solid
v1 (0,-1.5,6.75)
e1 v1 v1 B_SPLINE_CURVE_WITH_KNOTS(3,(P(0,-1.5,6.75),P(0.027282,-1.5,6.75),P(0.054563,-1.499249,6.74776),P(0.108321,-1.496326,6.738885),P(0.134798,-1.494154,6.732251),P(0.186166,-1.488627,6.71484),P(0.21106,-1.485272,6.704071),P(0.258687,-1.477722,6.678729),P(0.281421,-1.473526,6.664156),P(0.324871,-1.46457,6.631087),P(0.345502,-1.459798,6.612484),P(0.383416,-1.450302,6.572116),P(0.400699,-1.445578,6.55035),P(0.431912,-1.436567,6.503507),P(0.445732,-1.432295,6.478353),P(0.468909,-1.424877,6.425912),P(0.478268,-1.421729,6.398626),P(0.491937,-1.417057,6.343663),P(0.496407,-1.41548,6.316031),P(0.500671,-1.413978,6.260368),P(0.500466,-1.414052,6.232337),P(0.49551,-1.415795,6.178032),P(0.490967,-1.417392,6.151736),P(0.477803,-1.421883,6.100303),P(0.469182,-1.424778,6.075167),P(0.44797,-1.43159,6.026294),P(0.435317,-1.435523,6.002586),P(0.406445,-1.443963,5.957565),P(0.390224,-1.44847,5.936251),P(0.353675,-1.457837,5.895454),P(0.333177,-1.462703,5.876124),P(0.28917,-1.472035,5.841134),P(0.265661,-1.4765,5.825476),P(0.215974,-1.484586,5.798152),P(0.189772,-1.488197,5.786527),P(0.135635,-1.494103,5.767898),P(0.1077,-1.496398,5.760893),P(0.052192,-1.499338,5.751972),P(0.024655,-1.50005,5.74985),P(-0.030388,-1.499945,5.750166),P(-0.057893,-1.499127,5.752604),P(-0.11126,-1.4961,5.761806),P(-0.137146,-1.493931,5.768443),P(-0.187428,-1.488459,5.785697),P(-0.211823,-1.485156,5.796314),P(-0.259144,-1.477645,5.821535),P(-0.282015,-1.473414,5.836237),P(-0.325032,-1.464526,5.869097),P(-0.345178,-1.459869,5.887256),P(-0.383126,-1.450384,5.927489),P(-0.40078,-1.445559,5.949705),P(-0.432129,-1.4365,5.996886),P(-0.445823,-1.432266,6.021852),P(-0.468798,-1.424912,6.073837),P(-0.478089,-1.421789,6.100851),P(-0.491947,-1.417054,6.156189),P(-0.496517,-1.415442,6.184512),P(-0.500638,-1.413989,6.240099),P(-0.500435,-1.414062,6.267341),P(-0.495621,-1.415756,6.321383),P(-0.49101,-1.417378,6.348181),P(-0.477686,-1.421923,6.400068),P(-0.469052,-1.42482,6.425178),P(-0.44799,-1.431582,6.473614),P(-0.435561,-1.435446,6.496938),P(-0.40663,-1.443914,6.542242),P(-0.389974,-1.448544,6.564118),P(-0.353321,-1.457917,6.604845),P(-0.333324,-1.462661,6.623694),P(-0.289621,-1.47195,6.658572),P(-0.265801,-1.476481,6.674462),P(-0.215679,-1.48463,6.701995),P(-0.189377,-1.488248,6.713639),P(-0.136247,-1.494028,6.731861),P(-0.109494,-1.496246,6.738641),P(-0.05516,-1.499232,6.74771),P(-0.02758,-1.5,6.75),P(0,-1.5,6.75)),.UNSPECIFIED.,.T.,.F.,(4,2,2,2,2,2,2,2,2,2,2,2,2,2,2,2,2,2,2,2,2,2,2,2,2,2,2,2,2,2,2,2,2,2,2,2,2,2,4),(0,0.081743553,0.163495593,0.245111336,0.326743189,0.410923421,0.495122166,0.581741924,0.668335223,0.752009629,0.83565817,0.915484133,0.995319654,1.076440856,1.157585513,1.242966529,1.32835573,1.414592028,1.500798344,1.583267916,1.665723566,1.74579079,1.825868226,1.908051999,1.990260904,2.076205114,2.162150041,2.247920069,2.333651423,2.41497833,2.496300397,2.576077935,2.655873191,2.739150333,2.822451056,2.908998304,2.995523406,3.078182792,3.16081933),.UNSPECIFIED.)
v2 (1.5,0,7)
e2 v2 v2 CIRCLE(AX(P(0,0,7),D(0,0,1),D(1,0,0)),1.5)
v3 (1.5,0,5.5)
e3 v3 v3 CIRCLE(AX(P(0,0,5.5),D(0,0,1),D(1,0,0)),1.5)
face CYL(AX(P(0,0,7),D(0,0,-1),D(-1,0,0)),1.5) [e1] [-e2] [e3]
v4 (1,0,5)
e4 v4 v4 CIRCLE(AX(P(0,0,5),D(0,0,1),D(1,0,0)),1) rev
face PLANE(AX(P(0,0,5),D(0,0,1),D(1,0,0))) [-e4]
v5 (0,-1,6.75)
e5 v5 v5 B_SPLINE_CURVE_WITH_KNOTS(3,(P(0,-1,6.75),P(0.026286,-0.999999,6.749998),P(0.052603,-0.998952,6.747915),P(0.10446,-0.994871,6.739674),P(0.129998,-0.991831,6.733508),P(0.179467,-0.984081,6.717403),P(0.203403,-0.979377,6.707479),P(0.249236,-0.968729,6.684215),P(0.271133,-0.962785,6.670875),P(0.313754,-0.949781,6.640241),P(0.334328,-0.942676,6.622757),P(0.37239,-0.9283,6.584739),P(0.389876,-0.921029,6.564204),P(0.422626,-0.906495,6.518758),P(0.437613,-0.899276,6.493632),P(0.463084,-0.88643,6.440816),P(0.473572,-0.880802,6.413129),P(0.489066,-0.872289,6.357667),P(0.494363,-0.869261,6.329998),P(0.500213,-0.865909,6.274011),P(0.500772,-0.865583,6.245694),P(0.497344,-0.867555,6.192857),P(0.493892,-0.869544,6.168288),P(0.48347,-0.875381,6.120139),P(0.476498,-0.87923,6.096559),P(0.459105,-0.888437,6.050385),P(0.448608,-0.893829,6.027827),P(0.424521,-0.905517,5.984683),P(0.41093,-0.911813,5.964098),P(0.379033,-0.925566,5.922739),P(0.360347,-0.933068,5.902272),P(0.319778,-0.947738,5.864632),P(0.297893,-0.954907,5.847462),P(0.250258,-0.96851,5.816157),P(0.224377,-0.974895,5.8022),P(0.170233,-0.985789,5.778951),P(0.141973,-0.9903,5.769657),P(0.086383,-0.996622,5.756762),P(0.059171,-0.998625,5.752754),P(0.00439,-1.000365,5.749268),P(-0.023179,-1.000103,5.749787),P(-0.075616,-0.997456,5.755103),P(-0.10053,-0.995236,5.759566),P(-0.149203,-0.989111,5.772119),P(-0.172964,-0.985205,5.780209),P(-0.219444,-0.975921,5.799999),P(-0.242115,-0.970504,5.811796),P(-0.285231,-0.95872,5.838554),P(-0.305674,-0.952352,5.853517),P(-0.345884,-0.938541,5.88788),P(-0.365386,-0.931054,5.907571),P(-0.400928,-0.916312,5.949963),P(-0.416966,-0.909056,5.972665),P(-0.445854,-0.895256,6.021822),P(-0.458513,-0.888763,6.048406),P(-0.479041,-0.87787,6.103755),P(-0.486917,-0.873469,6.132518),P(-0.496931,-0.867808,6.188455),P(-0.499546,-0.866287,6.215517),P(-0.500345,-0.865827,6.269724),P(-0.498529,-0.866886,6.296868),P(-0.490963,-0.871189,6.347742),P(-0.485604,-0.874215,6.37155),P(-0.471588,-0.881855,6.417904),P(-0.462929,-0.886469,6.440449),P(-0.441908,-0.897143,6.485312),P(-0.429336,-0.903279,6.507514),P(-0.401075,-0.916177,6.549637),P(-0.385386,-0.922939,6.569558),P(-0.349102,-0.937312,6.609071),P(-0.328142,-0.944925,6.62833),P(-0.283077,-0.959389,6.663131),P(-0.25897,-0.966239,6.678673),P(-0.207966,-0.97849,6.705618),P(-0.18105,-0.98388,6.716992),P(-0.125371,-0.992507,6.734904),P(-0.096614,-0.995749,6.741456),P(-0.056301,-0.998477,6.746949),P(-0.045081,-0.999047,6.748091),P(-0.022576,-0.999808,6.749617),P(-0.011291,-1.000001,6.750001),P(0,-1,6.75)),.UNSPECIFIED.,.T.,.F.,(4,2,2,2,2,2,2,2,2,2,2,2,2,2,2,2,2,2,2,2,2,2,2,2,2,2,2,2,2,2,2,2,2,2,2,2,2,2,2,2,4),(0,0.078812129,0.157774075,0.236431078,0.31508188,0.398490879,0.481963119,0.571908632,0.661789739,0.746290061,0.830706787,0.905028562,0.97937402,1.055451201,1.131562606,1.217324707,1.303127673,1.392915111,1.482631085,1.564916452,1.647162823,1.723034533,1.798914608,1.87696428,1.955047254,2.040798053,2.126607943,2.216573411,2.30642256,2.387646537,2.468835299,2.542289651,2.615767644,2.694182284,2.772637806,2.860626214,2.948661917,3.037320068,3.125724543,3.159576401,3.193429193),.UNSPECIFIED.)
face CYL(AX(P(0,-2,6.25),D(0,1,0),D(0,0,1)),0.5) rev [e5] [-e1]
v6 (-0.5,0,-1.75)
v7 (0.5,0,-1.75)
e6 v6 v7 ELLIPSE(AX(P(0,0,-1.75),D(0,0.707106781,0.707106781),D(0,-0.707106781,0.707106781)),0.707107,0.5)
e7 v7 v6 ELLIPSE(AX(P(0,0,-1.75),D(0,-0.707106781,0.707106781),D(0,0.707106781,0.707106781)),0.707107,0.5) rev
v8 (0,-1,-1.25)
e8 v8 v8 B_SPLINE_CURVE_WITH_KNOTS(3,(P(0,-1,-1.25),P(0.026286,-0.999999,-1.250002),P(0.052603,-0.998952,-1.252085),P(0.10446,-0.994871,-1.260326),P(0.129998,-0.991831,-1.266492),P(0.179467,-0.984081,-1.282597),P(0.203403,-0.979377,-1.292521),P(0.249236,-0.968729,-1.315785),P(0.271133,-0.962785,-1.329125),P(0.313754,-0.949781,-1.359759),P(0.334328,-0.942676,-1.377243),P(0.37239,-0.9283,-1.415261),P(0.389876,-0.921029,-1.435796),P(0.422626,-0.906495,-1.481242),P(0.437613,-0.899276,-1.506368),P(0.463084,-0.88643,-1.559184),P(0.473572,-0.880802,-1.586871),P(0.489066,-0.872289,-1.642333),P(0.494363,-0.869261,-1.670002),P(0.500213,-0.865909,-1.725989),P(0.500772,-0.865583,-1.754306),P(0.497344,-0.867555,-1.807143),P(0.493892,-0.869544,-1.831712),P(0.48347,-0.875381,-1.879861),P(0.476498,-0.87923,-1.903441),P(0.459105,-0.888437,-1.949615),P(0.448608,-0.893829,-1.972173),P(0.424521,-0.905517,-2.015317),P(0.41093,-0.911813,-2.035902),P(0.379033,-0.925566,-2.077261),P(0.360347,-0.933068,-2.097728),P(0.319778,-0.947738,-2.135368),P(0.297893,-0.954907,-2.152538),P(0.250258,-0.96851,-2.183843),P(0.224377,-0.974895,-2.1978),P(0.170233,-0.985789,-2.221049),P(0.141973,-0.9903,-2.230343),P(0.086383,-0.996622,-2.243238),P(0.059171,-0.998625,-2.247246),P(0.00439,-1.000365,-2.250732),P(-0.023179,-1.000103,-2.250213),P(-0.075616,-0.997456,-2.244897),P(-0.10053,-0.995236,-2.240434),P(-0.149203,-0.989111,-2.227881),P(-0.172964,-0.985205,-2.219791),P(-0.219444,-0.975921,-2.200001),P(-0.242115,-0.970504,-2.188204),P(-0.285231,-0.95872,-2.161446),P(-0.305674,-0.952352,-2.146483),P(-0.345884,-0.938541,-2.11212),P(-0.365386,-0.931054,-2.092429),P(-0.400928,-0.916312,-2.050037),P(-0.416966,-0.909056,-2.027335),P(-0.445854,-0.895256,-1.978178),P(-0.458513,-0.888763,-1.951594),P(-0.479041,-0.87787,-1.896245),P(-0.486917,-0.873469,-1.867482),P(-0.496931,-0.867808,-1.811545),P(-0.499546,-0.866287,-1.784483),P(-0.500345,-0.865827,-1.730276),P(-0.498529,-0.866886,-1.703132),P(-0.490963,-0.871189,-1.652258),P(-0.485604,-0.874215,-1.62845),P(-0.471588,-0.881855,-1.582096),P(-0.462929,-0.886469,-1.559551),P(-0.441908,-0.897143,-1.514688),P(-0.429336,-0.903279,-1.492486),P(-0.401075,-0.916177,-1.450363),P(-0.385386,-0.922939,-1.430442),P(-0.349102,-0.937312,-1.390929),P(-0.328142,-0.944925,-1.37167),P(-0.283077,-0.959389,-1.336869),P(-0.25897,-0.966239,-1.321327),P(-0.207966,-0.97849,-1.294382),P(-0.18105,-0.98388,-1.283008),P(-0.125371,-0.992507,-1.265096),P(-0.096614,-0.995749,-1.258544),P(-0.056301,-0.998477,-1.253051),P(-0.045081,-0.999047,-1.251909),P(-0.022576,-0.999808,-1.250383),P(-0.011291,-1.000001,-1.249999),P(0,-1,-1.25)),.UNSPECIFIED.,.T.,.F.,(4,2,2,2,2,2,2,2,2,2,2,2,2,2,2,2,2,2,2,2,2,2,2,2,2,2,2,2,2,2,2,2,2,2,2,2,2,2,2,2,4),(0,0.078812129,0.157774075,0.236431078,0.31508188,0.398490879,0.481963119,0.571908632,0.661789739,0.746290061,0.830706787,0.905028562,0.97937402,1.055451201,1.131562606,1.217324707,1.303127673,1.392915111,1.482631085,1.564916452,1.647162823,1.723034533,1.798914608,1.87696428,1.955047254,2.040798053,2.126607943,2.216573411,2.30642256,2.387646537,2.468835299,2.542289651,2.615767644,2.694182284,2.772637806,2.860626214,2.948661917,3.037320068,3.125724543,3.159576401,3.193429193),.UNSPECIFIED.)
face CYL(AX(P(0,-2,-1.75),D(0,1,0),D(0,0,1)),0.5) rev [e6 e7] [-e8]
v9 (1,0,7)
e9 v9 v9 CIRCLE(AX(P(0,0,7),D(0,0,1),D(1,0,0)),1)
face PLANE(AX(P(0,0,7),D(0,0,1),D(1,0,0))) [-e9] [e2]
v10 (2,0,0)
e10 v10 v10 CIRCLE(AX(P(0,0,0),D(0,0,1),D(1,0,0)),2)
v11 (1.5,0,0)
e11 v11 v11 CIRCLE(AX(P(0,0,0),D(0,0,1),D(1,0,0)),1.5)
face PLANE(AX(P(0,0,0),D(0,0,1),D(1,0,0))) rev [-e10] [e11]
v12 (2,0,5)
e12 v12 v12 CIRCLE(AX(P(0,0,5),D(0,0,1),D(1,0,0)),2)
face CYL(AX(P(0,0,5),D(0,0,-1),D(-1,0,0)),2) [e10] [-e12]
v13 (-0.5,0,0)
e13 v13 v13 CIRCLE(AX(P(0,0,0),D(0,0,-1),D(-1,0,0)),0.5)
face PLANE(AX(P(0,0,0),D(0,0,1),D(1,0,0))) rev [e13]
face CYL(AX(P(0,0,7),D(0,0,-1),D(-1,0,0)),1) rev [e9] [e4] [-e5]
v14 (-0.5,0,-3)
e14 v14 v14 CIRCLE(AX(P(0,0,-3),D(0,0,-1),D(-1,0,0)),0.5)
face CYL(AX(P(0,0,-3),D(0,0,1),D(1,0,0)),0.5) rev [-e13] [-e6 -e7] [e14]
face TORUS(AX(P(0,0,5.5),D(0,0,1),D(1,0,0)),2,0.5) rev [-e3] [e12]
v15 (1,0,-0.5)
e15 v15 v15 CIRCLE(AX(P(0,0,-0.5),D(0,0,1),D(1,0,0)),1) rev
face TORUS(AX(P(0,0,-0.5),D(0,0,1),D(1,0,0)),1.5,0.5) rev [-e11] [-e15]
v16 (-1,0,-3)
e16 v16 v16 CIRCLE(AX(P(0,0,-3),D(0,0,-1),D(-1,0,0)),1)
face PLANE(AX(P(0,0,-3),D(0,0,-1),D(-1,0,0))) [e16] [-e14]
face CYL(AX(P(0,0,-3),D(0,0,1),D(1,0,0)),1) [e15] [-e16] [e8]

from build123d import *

# Parameters (mm, degrees)
ESQUISSE1_R             = 2
BOSS_EXTRU_1_DEPTH      = 5
ESQUISSE2_R             = 1.5
ESQUISSE2_R_2           = 1
BOSS_EXTRU_2_DEPTH      = 2
BOSS_EXTRU_3_START      = 3
ESQUISSE3_R             = 1
ESQUISSE3_R_2           = 0.5
BOSS_EXTRU_3_DEPTH      = 3
CONG_1_R                = 0.5
CONG_2_R                = 0.5
ESQUISSE5_R             = 0.5
ENL_V_MAT_EXTRU_1_DEPTH = 2


with BuildPart() as part:
    # Esquisse1 → Boss.-Extru.1 (new body)
    with BuildSketch(Plane.XY):
        Circle(ESQUISSE1_R)
    extrude(amount=BOSS_EXTRU_1_DEPTH)

    # Esquisse2 → Boss.-Extru.2 (add)
    with BuildSketch(Plane.XY.offset(5)):
        Circle(ESQUISSE2_R)
        Circle(ESQUISSE2_R_2, mode=Mode.SUBTRACT)
    extrude(amount=BOSS_EXTRU_2_DEPTH)

    # Esquisse3 → Boss.-Extru.3 (add)
    with BuildSketch(Plane(origin=(0, 0, 0), x_dir=(-1, 0, 0), z_dir=(0, 0, -1)).offset(BOSS_EXTRU_3_START)):
        with Locations(Location((0, 0, 0), (0, 0, 180))):
            Circle(ESQUISSE3_R)
        Circle(ESQUISSE3_R_2, mode=Mode.SUBTRACT)
    extrude(amount=-BOSS_EXTRU_3_DEPTH)

    # Congé1
    cong_1_edges = [part.edges().sort_by_distance(p)[0] for p in [
        (-1, 0, 0),
    ]]
    fillet(cong_1_edges, radius=CONG_1_R)

    # Congé2
    cong_2_edges = [part.edges().sort_by_distance(p)[0] for p in [
        (-1.5, 0, 5),
    ]]
    fillet(cong_2_edges, radius=CONG_2_R - 0.0001)  # a hair under: the kernel refuses the full size

    # Esquisse5 → Enlèv. mat.-Extru.1 (cut)
    with BuildSketch(Plane(origin=(0, 0, 0), x_dir=(1, 0, 0), z_dir=(0, 1, 0))):
        with Locations(Location((0, 1.75, 0), (0, 0, 270))):
            Circle(ESQUISSE5_R)
        with Locations(Location((0, -6.25, 0), (0, 0, 270))):
            Circle(ESQUISSE5_R)
    extrude(amount=-ENL_V_MAT_EXTRU_1_DEPTH, mode=Mode.SUBTRACT)


solid = part.part
